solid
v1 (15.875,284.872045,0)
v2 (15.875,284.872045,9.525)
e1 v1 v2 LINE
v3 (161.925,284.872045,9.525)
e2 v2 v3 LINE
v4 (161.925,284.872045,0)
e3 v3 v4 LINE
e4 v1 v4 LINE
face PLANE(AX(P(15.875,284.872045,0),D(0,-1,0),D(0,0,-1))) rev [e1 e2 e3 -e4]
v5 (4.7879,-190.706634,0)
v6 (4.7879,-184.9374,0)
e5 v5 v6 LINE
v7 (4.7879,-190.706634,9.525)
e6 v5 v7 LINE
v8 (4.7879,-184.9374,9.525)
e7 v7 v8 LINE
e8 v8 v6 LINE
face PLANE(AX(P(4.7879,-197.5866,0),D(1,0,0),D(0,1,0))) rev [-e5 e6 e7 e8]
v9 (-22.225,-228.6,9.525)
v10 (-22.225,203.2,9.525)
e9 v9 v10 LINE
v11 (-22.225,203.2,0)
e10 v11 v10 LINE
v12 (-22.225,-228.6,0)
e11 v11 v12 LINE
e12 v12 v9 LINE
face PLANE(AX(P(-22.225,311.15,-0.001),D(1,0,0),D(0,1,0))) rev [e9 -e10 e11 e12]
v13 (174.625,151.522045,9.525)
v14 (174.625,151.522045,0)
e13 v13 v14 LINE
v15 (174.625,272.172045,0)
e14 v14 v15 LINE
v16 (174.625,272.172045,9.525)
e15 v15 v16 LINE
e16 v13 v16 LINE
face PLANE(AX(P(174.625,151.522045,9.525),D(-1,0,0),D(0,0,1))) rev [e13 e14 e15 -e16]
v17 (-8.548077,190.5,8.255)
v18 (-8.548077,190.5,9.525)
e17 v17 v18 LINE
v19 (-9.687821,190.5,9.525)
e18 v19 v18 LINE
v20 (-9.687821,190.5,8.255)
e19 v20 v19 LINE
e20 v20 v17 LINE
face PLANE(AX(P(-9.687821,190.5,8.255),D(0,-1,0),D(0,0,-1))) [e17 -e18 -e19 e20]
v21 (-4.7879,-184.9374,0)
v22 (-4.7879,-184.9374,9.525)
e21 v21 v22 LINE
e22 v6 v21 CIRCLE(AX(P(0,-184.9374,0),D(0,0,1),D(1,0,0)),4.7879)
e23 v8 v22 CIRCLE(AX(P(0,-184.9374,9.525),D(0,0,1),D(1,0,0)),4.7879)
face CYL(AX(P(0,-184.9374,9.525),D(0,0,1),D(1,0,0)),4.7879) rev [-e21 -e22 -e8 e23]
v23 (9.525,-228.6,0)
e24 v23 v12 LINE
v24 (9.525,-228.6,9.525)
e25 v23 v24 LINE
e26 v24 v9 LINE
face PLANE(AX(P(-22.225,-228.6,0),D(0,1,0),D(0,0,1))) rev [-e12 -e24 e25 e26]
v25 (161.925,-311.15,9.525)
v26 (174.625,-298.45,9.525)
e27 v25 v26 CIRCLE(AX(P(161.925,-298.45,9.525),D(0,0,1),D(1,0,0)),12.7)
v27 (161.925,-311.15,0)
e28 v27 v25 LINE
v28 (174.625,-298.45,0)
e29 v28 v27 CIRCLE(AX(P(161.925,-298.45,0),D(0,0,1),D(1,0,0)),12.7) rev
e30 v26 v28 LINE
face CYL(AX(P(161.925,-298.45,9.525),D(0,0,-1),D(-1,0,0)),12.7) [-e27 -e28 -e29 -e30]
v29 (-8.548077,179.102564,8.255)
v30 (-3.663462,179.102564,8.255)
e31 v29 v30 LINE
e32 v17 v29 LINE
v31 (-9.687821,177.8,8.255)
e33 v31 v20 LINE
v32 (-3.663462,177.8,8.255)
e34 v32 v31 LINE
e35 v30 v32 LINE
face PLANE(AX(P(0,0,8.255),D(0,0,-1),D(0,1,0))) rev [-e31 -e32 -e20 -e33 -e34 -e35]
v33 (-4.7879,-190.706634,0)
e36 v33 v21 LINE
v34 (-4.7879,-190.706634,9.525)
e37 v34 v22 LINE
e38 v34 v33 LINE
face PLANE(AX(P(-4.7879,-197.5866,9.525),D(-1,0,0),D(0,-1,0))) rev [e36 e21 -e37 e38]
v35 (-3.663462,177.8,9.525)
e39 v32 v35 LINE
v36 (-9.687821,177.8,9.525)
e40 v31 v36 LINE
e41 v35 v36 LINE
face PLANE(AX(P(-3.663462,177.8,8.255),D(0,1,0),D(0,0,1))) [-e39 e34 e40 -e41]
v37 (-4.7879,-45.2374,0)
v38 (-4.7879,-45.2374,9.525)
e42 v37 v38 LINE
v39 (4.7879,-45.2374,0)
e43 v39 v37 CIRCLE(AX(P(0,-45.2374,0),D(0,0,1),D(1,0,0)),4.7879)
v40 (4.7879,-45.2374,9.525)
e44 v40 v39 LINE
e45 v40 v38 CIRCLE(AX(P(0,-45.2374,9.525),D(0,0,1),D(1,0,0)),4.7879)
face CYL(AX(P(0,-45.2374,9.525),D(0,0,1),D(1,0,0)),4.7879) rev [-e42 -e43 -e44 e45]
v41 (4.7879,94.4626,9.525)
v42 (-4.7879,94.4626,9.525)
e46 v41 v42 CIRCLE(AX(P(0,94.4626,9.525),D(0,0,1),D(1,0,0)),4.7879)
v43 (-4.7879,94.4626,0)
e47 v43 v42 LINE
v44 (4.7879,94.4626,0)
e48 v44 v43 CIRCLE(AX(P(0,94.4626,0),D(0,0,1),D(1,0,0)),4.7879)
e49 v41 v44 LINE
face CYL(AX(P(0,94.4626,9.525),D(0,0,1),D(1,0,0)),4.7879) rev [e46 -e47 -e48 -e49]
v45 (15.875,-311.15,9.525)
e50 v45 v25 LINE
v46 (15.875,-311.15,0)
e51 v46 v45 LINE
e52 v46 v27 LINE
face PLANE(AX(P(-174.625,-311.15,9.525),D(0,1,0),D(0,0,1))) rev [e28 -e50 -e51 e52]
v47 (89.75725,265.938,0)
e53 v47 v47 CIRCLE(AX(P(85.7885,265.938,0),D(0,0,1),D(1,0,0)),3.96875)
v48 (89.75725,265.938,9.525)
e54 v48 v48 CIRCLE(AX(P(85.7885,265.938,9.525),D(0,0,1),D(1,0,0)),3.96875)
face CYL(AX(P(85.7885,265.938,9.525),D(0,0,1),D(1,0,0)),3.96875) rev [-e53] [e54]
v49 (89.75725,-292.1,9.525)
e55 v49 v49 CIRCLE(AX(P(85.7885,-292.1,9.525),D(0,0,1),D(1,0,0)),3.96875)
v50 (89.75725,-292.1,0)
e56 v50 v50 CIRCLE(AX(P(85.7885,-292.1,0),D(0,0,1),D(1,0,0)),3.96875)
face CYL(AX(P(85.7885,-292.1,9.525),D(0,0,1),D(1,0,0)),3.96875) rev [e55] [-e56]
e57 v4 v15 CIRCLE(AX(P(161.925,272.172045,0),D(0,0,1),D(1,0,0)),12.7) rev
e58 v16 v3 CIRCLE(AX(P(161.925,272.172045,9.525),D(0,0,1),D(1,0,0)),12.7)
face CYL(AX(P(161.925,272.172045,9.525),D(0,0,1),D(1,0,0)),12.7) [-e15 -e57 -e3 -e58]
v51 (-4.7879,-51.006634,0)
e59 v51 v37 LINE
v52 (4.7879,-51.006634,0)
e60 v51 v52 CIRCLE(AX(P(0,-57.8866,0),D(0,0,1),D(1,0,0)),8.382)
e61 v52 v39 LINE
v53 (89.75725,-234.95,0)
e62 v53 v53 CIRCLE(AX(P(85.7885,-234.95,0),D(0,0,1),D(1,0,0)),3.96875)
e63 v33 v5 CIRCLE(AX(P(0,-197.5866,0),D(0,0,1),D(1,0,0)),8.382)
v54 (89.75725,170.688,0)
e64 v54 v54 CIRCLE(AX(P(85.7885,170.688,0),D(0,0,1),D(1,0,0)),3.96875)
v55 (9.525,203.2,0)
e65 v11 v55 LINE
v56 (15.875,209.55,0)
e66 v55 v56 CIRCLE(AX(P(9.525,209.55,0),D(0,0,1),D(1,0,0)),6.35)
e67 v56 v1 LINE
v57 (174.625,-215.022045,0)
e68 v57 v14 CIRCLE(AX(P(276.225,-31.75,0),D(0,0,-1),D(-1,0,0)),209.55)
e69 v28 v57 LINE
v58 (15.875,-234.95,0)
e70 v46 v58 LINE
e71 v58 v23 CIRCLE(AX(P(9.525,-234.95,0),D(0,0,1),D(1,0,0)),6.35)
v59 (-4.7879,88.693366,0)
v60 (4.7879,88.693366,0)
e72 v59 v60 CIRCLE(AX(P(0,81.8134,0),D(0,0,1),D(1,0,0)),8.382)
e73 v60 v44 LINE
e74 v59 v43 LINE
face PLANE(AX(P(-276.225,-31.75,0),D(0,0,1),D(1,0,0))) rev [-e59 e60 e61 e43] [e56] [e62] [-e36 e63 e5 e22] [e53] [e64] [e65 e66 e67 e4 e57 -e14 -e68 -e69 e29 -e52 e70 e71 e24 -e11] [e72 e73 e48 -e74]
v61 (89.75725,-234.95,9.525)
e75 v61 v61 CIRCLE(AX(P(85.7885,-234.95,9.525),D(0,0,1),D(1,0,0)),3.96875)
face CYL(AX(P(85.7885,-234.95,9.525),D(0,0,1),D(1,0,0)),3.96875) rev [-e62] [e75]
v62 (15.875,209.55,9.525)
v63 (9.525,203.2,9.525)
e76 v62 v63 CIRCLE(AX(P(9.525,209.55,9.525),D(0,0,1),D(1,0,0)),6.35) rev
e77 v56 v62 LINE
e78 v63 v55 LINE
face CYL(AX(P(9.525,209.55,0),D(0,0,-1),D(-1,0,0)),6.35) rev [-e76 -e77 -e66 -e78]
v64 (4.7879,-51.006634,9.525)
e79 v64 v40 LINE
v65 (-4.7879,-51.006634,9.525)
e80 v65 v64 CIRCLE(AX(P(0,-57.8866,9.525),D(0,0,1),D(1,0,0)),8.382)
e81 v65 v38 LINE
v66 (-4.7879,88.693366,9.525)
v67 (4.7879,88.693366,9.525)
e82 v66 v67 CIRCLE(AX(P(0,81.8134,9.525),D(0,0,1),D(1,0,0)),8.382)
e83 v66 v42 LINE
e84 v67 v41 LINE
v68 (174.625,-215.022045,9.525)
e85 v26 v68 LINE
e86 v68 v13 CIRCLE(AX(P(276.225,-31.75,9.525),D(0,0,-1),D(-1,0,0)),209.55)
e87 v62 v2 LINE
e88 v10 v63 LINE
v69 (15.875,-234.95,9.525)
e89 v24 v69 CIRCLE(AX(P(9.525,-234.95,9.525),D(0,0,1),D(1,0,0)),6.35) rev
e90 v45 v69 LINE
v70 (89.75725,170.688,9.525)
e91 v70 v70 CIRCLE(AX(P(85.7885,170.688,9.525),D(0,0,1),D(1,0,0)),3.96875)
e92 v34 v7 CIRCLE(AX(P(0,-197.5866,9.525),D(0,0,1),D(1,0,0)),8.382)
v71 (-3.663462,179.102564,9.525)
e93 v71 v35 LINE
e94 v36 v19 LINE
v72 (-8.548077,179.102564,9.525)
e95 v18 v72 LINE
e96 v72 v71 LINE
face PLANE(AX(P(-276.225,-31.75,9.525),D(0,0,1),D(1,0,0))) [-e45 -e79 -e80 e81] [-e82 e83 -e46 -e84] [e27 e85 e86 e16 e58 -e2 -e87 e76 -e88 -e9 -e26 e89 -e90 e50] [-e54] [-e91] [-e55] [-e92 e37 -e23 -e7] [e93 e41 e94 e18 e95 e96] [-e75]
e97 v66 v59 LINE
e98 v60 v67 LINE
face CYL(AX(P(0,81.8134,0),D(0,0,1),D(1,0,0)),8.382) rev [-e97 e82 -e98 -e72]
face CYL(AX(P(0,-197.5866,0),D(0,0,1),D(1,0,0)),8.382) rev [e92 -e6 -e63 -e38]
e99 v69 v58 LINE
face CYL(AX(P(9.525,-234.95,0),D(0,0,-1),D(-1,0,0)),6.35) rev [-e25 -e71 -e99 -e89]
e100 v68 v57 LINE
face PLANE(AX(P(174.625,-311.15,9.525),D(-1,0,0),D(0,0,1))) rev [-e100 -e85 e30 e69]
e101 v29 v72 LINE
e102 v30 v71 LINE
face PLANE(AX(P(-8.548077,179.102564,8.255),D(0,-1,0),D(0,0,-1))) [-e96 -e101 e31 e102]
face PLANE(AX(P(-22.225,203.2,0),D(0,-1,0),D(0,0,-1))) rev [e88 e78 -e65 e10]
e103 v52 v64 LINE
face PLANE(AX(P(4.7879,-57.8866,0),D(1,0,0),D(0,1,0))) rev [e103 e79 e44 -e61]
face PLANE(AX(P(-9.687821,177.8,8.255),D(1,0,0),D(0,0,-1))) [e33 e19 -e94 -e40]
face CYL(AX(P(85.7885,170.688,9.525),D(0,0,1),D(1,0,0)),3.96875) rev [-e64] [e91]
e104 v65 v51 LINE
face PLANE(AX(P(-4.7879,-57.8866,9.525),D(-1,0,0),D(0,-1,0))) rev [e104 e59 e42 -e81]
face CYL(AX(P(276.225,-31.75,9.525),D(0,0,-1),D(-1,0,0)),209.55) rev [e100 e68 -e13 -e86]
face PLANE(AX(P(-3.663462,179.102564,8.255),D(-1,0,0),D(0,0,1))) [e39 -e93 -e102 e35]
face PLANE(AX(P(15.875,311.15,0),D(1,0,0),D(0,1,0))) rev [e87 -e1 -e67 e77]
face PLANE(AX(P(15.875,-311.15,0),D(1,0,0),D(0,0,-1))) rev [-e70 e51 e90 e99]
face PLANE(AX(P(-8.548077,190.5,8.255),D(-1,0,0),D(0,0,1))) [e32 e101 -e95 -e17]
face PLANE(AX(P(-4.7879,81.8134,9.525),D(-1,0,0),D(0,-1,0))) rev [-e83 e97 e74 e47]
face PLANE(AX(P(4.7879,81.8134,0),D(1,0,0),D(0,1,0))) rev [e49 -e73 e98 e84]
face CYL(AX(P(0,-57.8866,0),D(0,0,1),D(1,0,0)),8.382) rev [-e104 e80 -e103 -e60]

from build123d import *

# Parameters (mm, degrees)
BOSS_EXTRUDE1_DEPTH            = 9.525
V_0_377_DIAMETER_SLOT2_DEPTH   = 9.525
CUT_EXTRUDE1_REACH             = 358.93
SKETCH6_W                      = 152.4
SKETCH6_H                      = 622.3
FILLET1_R                      = 12.7
SKETCH7_R                      = 8.382
CUT_EXTRUDE2_DEPTH             = 357.929879318
SKETCH12_W                     = 38.1
SKETCH12_H                     = 107.95
SKETCH12_H_2                   = 82.55
CUT_EXTRUDE3_DEPTH             = 357.929879318
FILLET2_R                      = 6.35
F_5_16_0_3125_DIAMETER_HOLE1_D = 7.9375
SKETCH16_W                     = 158.75
SKETCH16_H                     = 26.277954941
CUT_EXTRUDE4_DEPTH             = 357.929879318
F_5_16_0_3125_DIAMETER_HOLE2_D = 7.9375
FILLET3_R                      = 12.7
CUT_EXTRUDE5_DEPTH             = 1.27


# Read off the part's stored shape, not the designer's step: V (0.377) Diameter Slot2
with BuildPart() as part:
    # Sketch1 → Boss-Extrude1 (new body)
    with BuildSketch(Plane.XY):
        with BuildLine():
            Line((-174.625, 151.522045059), (-174.625, 311.15))
            Line((-174.625, 311.15), (174.625, 311.15))
            Line((174.625, 311.15), (174.625, 151.522045059))
            ThreePointArc((174.625, 151.522045059), (66.675, -31.75), (174.625, -215.022045059))
            Line((174.625, -215.022045059), (174.625, -311.15))
            Line((174.625, -311.15), (-174.625, -311.15))
            Line((-174.625, -311.15), (-174.625, -215.022045059))
            ThreePointArc((-174.625, -215.022045059), (-66.675, -31.75), (-174.625, 151.522045059))
        make_face()
    extrude(amount=BOSS_EXTRUDE1_DEPTH)

    # V (0.377) Diameter Slot2 outline → V (0.377) Diameter Slot2 (cut)
    with BuildSketch(Plane.XY):
        with BuildLine():
            Line((4.7879, -57.8866), (4.7879, -45.2374))
            ThreePointArc((4.7879, -45.2374), (0, -40.4495), (-4.7879, -45.2374))
            Line((-4.7879, -45.2374), (-4.7879, -57.8866))
            ThreePointArc((-4.7879, -57.8866), (0, -62.6745), (4.7879, -57.8866))
        make_face()
        with BuildLine():
            ThreePointArc((4.7879, 94.4626), (0, 99.2505), (-4.7879, 94.4626))
            Line((-4.7879, 94.4626), (-4.7879, 81.8134))
            ThreePointArc((-4.7879, 81.8134), (0, 77.0255), (4.7879, 81.8134))
            Line((4.7879, 81.8134), (4.7879, 94.4626))
        make_face()
        with BuildLine():
            ThreePointArc((4.7879, -184.9374), (0, -180.1495), (-4.7879, -184.9374))
            Line((-4.7879, -184.9374), (-4.7879, -197.5866))
            ThreePointArc((-4.7879, -197.5866), (0, -202.3745), (4.7879, -197.5866))
            Line((4.7879, -197.5866), (4.7879, -184.9374))
        make_face()
    extrude(amount=V_0_377_DIAMETER_SLOT2_DEPTH, mode=Mode.SUBTRACT)

    # Sketch6 → Cut-Extrude1 (cut, up to next)
    with BuildSketch(Plane.XY.offset(9.525), mode=Mode.PRIVATE) as cut_extrude1_sk1:
        with Locations((-98.425, 0)):
            Rectangle(SKETCH6_W, SKETCH6_H)
    cut_extrude1_tool1 = extrude(cut_extrude1_sk1.sketch, amount=-CUT_EXTRUDE1_REACH, mode=Mode.PRIVATE) & part.part
    add(cut_extrude1_tool1.solids().sort_by_distance((-98.425, 0, 9.525))[0], mode=Mode.SUBTRACT)

    # Fillet1
    fillet1_edges = [part.edges().sort_by_distance(p)[0] for p in [
        (174.625, -311.15, 4.7625),
    ]]
    fillet(fillet1_edges, radius=FILLET1_R)

    # Sketch7 → Cut-Extrude2 (cut, through all)
    with BuildSketch(Plane.XY.offset(9.525)):
        with Locations((0, -197.5866)):
            Circle(SKETCH7_R)
        with Locations((0, 81.8134)):
            Circle(SKETCH7_R)
        with Locations((0, -57.8866)):
            Circle(SKETCH7_R)
    extrude(amount=-CUT_EXTRUDE2_DEPTH, mode=Mode.SUBTRACT)

    # Sketch12 → Cut-Extrude3 (cut, through all)
    with BuildSketch(Plane.XY.offset(9.525)):
        with Locations((-3.175, 257.175)):
            Rectangle(SKETCH12_W, SKETCH12_H)
        with Locations((-3.175, -269.875)):
            Rectangle(SKETCH12_W, SKETCH12_H_2)
    extrude(amount=-CUT_EXTRUDE3_DEPTH, mode=Mode.SUBTRACT)

    # Fillet2
    fillet2_edges = [part.edges().sort_by_distance(p)[0] for p in [
        (15.875, 203.2, 4.7625),
        (15.875, -228.6, 4.7625),
    ]]
    fillet(fillet2_edges, radius=FILLET2_R)

    # 5/16 (0.3125) Diameter Hole1 (through all)
    with Locations(Plane.XY.offset(9.525)):
        with Locations((85.7885, 170.688), (85.7885, 265.938)):
            Hole(F_5_16_0_3125_DIAMETER_HOLE1_D / 2)

    # Sketch16 → Cut-Extrude4 (cut, through all)
    with BuildSketch(Plane.XY.offset(9.525)):
        with Locations((95.25, 298.011022529)):
            Rectangle(SKETCH16_W, SKETCH16_H)
    extrude(amount=-CUT_EXTRUDE4_DEPTH, mode=Mode.SUBTRACT)

    # 5/16 (0.3125) Diameter Hole2 (through all)
    with Locations(Plane.XY.offset(9.525)):
        with Locations((85.7885, -234.95), (85.7885, -292.1)):
            Hole(F_5_16_0_3125_DIAMETER_HOLE2_D / 2)

    # Fillet3
    fillet3_edges = [part.edges().sort_by_distance(p)[0] for p in [
        (174.625, 284.872045059, 4.7625),
    ]]
    fillet(fillet3_edges, radius=FILLET3_R)

    # Sketch22 → Cut-Extrude5 (cut)
    with BuildSketch(Plane(origin=(0, 0, 9.525), x_dir=(-1, 0, 0), z_dir=(0, 0, -1))):
        Polygon((9.687820513, 190.5), (8.548076923, 190.5), (8.548076923, 179.102564103), (3.663461538, 179.102564103), (3.663461538, 177.8), (9.687820513, 177.8), align=None)
    extrude(amount=CUT_EXTRUDE5_DEPTH, mode=Mode.SUBTRACT)


solid = part.part
